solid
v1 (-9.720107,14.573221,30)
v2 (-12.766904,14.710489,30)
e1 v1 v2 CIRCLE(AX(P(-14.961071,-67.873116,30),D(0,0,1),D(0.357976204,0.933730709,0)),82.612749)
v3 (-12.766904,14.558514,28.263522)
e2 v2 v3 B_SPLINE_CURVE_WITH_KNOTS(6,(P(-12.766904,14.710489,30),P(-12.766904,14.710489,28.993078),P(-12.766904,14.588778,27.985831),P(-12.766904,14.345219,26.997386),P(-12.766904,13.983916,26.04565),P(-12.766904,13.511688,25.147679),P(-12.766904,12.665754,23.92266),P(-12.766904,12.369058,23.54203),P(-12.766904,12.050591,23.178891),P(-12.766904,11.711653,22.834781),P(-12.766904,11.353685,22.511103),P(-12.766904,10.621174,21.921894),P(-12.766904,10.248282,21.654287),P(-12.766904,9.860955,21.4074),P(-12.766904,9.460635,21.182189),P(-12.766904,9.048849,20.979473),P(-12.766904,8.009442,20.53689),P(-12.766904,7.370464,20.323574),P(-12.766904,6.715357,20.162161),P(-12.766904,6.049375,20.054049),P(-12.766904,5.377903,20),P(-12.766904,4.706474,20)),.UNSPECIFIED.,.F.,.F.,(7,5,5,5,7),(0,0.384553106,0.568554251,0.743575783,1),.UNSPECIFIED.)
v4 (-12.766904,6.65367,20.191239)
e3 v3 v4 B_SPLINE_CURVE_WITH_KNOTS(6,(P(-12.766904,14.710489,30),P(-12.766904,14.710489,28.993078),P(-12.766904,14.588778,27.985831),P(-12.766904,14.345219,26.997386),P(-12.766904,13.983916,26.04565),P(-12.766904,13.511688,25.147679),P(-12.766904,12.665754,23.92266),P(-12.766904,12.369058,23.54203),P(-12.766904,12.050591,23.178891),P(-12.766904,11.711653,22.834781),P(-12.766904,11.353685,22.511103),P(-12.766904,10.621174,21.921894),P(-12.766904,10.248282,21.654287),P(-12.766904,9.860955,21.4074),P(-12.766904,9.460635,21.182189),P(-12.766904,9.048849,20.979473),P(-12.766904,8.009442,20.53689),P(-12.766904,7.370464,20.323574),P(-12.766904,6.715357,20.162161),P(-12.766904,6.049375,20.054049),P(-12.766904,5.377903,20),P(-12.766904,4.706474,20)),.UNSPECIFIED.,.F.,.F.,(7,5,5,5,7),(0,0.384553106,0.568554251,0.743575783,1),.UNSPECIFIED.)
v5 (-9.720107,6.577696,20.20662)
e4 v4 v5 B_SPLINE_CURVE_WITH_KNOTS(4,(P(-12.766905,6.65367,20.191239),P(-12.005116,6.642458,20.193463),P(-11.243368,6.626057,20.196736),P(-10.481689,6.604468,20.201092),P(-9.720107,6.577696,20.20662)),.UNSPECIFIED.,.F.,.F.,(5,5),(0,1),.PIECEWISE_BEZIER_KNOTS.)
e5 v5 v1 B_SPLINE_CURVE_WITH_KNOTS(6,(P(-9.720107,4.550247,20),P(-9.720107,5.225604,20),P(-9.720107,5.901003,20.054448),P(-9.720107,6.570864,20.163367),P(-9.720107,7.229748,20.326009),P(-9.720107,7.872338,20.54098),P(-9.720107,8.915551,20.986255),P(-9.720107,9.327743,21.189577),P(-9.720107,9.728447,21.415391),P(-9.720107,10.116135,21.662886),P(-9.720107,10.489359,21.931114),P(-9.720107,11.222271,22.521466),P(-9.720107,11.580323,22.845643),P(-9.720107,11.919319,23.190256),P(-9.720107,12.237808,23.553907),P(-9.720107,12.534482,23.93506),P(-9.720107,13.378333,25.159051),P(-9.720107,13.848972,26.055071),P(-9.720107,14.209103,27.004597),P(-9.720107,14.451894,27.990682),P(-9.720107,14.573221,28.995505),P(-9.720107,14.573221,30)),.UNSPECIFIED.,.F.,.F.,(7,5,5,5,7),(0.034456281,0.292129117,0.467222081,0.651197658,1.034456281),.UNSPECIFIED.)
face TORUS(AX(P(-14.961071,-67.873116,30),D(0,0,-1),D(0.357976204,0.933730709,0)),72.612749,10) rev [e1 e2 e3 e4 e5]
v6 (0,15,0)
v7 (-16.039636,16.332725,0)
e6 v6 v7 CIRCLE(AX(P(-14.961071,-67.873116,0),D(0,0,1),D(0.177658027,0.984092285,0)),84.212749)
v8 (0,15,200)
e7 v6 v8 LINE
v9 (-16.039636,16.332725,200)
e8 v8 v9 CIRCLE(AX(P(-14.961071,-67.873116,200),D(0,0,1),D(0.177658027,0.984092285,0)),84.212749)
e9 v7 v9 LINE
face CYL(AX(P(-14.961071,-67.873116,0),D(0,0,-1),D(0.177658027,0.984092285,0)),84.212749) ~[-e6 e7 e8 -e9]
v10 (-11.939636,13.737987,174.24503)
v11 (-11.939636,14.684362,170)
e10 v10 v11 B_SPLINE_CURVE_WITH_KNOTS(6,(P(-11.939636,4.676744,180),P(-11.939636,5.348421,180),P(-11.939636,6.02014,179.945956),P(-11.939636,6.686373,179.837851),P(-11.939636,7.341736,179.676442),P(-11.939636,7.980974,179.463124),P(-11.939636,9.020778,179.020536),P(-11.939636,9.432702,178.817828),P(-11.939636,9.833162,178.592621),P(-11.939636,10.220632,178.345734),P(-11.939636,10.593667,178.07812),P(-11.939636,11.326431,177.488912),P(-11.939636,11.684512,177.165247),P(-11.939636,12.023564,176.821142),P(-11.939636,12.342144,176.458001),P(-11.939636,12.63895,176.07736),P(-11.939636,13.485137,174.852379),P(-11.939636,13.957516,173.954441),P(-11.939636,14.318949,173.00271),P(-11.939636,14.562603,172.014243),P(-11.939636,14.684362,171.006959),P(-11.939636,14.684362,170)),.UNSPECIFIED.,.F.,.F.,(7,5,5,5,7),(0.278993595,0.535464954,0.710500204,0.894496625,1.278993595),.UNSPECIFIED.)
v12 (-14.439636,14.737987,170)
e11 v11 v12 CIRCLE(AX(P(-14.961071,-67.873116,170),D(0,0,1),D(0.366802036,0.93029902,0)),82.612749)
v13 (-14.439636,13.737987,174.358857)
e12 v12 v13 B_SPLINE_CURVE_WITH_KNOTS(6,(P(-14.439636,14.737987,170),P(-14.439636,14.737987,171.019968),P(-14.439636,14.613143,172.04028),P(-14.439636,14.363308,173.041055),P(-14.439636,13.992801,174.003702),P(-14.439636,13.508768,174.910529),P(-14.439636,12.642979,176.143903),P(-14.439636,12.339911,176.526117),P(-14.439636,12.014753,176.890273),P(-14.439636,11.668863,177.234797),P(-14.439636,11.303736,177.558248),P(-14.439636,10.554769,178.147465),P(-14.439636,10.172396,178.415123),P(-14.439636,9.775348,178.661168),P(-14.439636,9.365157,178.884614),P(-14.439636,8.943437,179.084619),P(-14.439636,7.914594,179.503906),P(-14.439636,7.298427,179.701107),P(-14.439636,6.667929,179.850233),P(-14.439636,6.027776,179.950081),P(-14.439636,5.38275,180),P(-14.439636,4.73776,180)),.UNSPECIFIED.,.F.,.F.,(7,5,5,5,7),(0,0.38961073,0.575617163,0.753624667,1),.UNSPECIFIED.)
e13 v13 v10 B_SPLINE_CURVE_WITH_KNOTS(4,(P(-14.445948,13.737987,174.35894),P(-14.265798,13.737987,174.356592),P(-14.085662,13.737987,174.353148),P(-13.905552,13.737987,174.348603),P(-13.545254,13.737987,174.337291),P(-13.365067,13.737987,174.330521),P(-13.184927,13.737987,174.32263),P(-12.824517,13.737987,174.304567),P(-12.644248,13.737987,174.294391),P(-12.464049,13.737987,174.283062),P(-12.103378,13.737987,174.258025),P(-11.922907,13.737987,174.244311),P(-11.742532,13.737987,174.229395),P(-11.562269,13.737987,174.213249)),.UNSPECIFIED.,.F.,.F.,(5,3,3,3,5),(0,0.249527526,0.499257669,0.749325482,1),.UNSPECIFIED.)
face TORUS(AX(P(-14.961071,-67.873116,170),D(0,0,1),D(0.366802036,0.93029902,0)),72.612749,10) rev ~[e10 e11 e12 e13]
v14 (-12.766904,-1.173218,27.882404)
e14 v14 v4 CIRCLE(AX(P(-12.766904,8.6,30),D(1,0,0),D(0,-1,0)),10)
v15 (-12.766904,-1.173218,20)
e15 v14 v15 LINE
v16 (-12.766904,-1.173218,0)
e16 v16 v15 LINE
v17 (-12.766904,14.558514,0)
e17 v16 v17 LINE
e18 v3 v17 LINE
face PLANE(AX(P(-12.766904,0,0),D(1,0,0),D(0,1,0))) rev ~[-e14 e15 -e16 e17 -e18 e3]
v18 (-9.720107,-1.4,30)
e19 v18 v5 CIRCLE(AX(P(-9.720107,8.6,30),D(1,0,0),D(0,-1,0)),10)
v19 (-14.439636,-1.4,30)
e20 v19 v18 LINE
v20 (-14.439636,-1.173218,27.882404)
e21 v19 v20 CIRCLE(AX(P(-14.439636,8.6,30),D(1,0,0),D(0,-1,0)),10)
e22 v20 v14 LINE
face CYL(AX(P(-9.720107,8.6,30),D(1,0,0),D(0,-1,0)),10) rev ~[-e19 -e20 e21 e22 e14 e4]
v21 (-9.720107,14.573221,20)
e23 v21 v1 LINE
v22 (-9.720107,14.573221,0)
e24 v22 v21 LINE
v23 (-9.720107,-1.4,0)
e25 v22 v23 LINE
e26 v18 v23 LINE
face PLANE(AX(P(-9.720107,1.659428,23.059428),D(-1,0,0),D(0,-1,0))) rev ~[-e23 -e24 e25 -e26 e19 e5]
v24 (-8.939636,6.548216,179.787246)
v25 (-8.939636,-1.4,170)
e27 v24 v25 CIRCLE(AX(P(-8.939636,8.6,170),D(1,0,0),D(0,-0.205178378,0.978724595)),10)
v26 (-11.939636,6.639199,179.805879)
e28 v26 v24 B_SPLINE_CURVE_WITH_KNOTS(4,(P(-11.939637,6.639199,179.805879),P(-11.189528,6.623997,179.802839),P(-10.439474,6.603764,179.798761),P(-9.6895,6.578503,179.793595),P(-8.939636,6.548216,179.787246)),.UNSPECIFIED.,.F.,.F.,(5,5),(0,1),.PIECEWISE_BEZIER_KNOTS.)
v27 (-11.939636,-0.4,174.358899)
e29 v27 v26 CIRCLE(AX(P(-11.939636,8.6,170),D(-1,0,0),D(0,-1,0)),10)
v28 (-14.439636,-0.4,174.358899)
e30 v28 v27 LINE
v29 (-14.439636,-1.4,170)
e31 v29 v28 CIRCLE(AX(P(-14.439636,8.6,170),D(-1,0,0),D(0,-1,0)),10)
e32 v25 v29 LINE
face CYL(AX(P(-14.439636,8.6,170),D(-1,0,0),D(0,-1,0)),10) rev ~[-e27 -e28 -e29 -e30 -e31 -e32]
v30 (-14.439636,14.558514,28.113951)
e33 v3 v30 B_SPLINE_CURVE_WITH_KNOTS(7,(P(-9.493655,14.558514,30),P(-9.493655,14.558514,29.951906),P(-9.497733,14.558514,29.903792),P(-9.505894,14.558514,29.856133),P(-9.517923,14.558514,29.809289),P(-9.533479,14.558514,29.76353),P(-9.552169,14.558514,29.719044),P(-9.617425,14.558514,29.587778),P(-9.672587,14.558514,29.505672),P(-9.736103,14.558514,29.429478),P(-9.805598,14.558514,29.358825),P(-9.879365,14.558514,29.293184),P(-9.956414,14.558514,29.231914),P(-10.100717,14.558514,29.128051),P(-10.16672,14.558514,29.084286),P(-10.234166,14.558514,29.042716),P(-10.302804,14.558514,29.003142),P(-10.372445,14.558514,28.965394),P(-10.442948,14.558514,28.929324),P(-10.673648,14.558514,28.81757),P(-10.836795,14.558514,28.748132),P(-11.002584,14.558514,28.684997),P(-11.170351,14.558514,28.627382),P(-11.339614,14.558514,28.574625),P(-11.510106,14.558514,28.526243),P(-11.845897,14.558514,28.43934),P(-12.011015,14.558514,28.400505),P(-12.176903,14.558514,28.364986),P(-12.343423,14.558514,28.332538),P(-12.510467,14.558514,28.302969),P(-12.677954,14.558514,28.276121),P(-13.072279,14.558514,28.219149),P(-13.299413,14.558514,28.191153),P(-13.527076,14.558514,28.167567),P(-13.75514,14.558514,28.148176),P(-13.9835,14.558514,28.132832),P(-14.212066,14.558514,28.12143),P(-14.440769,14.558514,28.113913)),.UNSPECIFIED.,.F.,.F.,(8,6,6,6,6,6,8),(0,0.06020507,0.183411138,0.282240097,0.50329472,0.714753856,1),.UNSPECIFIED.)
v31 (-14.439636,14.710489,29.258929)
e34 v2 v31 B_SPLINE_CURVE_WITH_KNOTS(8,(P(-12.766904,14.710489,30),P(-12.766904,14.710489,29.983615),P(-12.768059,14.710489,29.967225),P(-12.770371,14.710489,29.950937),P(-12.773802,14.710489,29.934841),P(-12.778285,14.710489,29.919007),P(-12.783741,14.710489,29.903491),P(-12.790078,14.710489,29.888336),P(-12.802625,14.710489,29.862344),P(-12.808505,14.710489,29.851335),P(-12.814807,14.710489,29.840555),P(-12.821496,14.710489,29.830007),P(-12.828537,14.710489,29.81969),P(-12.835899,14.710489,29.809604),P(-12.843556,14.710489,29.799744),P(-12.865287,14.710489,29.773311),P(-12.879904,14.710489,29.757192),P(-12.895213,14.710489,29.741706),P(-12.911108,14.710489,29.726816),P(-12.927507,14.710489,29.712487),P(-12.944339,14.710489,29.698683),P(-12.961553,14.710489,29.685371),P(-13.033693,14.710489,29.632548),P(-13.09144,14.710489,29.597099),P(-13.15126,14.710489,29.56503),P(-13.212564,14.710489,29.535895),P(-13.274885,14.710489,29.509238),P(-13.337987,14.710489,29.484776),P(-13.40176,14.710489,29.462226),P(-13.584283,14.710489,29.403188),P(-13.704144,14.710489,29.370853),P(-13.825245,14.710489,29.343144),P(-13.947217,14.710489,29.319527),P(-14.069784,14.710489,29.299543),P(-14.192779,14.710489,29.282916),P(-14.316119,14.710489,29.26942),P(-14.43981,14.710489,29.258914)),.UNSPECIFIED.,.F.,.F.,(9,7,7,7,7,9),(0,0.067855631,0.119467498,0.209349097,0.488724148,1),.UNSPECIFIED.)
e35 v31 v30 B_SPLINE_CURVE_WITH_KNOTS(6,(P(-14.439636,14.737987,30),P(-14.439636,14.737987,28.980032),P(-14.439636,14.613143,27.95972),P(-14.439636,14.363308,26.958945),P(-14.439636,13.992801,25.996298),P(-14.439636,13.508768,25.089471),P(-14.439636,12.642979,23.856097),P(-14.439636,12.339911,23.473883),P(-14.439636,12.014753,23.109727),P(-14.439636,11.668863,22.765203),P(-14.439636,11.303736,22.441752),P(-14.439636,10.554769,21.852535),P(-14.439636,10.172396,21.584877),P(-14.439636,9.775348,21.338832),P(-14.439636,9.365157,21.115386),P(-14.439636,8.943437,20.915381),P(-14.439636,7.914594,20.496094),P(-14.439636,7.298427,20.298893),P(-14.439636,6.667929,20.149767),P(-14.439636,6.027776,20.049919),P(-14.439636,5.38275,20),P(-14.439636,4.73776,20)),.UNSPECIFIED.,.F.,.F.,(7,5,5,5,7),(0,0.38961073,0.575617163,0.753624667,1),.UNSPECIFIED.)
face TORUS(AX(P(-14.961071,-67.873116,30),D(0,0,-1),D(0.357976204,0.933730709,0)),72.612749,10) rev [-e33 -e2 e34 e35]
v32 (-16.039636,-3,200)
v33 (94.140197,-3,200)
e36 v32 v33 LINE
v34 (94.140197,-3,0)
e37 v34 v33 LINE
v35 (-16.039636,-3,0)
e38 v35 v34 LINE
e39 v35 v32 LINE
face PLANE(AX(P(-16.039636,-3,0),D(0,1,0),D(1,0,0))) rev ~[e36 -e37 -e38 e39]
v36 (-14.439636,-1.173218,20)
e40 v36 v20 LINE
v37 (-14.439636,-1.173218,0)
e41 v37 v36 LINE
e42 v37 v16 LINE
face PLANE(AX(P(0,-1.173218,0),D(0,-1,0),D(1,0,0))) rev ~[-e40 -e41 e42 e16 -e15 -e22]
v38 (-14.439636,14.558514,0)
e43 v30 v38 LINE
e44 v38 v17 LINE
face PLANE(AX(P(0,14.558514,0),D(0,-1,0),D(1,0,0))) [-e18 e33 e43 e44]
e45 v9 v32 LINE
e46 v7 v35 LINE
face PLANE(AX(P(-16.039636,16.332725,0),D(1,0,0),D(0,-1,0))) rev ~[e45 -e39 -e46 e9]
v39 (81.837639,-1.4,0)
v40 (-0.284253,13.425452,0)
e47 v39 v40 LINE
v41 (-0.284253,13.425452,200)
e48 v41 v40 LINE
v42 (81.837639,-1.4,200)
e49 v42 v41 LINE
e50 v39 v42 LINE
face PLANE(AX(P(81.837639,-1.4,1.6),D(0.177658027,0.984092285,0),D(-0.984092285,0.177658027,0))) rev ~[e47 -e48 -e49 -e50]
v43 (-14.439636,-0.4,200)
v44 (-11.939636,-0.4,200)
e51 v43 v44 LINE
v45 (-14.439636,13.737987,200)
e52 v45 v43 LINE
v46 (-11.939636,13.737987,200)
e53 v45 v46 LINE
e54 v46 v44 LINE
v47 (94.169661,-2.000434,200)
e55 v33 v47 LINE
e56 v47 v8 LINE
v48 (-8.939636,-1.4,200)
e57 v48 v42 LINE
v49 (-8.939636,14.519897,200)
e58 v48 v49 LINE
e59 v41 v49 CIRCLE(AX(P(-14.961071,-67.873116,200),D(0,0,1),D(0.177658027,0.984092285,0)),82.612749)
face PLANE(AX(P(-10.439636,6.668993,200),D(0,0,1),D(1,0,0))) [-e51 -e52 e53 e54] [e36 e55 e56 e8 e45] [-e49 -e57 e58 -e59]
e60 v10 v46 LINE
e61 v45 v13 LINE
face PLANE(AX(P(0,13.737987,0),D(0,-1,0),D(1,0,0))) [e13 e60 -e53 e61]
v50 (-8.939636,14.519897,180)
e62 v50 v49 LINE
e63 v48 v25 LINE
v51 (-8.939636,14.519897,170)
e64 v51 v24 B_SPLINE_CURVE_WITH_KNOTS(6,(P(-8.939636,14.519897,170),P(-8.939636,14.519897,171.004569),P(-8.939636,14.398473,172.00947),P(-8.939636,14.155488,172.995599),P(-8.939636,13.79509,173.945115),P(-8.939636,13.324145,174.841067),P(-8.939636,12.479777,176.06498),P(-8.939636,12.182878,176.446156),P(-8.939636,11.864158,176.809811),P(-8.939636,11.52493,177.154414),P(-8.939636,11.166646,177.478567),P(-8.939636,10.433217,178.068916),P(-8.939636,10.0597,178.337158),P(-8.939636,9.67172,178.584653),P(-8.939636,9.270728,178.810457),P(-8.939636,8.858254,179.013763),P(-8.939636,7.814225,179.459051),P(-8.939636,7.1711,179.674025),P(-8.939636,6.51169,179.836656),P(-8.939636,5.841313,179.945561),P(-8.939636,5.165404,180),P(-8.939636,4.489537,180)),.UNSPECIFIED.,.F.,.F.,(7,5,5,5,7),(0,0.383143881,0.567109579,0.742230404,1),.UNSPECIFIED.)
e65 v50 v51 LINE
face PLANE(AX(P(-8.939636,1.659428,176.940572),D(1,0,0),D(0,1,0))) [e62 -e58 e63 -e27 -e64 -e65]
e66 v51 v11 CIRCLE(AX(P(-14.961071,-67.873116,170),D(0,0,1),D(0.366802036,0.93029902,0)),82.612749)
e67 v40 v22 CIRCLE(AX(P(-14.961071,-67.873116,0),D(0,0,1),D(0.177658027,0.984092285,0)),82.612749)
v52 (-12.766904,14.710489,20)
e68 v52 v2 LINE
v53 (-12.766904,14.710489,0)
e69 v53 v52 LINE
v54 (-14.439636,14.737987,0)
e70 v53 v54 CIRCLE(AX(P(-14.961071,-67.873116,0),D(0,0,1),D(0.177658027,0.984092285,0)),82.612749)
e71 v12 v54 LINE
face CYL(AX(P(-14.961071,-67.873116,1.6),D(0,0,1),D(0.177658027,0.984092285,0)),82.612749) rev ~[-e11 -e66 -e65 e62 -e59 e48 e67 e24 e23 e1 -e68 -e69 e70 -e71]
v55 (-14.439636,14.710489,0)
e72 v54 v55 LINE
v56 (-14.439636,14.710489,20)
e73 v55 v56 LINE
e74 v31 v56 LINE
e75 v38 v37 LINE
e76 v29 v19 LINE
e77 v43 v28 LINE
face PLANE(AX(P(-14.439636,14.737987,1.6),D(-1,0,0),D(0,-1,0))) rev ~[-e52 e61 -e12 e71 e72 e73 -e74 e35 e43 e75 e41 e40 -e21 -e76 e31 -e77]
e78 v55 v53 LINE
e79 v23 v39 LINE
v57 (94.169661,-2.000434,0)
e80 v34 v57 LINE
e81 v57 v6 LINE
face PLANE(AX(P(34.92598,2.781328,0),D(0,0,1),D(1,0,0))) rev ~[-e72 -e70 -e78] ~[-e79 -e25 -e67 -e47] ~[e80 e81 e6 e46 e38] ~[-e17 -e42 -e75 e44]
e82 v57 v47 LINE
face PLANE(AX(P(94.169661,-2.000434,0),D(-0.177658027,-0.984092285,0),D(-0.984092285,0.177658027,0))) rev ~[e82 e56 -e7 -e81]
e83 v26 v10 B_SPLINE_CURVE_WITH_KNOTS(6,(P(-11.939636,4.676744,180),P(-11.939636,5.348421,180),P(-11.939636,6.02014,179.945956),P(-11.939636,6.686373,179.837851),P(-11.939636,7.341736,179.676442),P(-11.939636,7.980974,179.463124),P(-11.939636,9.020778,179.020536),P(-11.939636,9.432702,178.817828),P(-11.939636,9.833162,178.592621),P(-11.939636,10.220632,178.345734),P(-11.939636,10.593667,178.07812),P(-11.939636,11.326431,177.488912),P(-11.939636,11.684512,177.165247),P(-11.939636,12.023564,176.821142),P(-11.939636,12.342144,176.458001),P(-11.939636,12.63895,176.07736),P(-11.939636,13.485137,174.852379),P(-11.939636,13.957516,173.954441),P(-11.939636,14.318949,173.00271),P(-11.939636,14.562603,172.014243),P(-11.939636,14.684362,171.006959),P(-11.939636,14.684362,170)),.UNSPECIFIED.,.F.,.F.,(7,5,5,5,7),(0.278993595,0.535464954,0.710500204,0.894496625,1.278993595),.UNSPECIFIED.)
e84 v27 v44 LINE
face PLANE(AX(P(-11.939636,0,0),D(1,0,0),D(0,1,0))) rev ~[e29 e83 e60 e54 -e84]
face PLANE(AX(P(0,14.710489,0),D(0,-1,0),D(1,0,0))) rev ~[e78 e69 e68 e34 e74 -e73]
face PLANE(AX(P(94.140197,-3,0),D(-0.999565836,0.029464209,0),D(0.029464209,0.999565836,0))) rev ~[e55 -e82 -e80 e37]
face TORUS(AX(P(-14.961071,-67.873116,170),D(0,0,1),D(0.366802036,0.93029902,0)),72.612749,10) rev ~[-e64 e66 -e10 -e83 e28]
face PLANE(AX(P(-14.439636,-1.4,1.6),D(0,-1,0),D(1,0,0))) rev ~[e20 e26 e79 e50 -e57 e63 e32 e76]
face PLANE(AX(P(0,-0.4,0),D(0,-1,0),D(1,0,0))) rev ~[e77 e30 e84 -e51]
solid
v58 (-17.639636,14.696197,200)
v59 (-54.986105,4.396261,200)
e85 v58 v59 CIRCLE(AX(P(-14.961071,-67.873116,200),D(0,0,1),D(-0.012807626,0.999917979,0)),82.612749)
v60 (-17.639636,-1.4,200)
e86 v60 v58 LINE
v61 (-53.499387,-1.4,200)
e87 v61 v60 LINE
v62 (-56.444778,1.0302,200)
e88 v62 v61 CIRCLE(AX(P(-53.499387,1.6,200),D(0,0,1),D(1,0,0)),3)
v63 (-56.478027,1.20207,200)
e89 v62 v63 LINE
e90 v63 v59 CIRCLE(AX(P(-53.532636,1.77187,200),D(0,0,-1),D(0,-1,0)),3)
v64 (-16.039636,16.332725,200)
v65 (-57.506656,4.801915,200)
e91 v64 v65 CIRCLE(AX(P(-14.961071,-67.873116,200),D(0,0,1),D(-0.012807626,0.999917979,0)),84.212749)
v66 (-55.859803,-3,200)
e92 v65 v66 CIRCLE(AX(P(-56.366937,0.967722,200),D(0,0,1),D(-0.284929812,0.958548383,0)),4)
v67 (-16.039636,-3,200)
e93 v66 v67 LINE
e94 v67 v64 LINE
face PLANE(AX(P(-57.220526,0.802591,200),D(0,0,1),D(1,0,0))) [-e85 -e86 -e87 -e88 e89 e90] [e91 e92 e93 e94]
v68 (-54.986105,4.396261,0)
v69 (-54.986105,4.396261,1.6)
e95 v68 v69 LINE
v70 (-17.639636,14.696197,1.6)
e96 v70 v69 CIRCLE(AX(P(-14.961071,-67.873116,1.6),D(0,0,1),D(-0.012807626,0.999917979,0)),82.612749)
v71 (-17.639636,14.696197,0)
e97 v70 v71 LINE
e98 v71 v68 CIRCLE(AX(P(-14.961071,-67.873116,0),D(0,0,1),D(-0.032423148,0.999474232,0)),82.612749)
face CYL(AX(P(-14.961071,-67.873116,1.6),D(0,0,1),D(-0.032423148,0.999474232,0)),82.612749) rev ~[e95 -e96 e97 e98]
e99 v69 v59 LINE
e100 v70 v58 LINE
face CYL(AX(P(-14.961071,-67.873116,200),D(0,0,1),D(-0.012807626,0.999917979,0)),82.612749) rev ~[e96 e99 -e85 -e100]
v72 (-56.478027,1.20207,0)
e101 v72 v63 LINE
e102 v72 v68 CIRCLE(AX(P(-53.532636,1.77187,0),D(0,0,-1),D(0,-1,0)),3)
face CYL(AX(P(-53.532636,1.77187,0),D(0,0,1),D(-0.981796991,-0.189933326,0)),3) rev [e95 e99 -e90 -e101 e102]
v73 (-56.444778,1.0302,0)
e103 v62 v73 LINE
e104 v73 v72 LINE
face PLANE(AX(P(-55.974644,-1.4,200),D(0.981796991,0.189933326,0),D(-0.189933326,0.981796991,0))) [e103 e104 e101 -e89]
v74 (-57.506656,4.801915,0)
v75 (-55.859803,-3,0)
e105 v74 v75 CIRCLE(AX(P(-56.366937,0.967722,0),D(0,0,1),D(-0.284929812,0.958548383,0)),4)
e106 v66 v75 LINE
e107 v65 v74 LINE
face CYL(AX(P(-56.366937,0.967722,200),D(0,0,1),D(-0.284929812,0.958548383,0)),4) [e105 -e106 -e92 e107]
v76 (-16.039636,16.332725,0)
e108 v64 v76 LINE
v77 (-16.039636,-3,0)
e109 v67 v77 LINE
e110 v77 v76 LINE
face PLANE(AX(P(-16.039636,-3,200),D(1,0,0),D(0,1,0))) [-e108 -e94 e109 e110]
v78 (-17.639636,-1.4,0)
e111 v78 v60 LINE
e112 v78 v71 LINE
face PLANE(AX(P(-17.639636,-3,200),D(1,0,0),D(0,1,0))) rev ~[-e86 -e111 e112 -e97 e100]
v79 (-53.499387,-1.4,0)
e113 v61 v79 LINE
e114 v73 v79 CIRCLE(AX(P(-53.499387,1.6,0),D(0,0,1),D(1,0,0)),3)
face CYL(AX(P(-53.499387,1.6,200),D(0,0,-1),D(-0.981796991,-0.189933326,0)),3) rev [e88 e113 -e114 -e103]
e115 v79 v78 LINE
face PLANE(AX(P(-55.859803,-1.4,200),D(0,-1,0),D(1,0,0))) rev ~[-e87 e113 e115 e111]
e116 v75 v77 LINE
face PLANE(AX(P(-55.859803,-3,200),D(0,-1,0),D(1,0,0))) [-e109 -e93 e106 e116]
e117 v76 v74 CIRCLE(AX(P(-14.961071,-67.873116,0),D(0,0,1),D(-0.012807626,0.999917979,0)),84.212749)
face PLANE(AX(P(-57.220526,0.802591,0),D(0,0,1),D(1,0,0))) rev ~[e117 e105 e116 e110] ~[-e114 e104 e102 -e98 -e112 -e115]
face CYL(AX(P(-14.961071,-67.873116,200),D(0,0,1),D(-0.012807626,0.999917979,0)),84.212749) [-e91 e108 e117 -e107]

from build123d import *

# Parameters (mm, degrees)
F1_DEPTH      = 200
F3_DEPTH      = 200
F4_T          = -1.6
F4_2_T        = -1.6
F5_DEPTH      = 1.6
F6_W          = 2.5
F6_H          = 1
F7_DEPTH      = 20
F8_T4_ANGLE   = 38.4955577252
F8_T11_ANGLE  = 38.4955577252
F8_T18_ANGLE  = 38.4955577252
F8_T25_DEPTH  = 5.5
F8_T31_DEPTH  = 5.5
F8_T37_DEPTH  = 5.5
F9_W          = 1.672731913
F9_H          = 0.2267822191
F9_H_2        = 0.1519754522
F10_DEPTH     = 20
F11_T4_ANGLE  = 36.7926896337
F11_T10_ANGLE = 36.7926896337
F11_T18_DEPTH = 29.7195290041
F11_T23_DEPTH = 4.7195290041
F13_DEPTH     = 200
F14_R         = 3


# Not quite as in the source:
# - a fillet or chamfer that OpenCascade refuses, or shapes differently, is made with other operations: its cross-section is extruded or revolved along the edge and cut away or added


with BuildPart() as f1:
    # F0 (on Top) → F1 (new body)
    with BuildSketch(Plane.XY):
        with BuildLine():
            Line((94.1401966023, -3), (94.1696608117, -2.0004341641))
            Line((94.1696608117, -2.0004341641), (0, 15))
            ThreePointArc((0, 15), (-7.9879059152, 16.0504323354), (-16.0396361483, 16.3327251865))
            Line((-16.0396361483, 16.3327251865), (-16.0396361483, -3))
            Line((-16.0396361483, -3), (94.1401966023, -3))
        make_face()
    extrude(amount=F1_DEPTH)

    # F4
    f4_openings = [f1.faces().sort_by_distance(p)[0] for p in [
        (22.614044, 3.891358, 200),
    ]]
    offset(amount=F4_T, openings=f4_openings)


with BuildPart() as f3:
    # F2 (on face) → F3 (new body)
    with BuildSketch(Plane.XY.offset(200)):
        with BuildLine():
            Line((-16.0396361483, -3), (-16.0396361483, 16.3327251865))
            ThreePointArc((-16.0396361483, 16.3327251865), (-37.5222437907, 13.2612199418), (-57.5066562048, 4.8019152395))
            ThreePointArc((-57.5066562048, 4.8019152395), (-60.2806962129, 0.1415930949), (-55.8598033977, -3))
            Line((-55.8598033977, -3), (-16.0396361483, -3))
        make_face()
    extrude(amount=-F3_DEPTH)

    # F4#2
    f4_2_openings = [f3.faces().sort_by_distance(p)[0] for p in [
        (-34.83961, 5.023506, 200),
    ]]
    offset(amount=F4_2_T, openings=f4_2_openings, kind=Kind.INTERSECTION)


with BuildPart() as f5_tool:
    # F4_face (on face) → F5 (new body, through all)
    with BuildSketch(Plane(origin=(-34.5686000718, 5.0952187138, 1.6), x_dir=(1, 0, 0), z_dir=(0, 0, 1))):
        with BuildLine():
            ThreePointArc((16.9289639236, 9.600978508), (-3.4092890923, 6.3732828215), (-22.3173938219, -1.7842983593))
            ThreePointArc((-22.3173938219, -1.7842983593), (-24.1546496637, -4.5833369872), (-21.4060437384, -6.4952187138))
            Line((-21.4060437384, -6.4952187138), (16.9289639236, -6.4952187138))
            Line((16.9289639236, -6.4952187138), (16.9289639236, 9.600978508))
        make_face()
        with BuildLine():
            Line((116.4062392425, -6.4952187138), (34.2843472293, 8.3302336301))
            ThreePointArc((34.2843472293, 8.3302336301), (27.2349408421, 9.2915509636), (20.1289639236, 9.6427680764))
            Line((20.1289639236, 9.6427680764), (20.1289639236, -6.4952187138))
            Line((20.1289639236, -6.4952187138), (116.4062392425, -6.4952187138))
        make_face()
    extrude(amount=-F5_DEPTH)


with BuildPart() as f1_1:
    add(f1.part)

    # F5: cut by f5_tool
    add(f5_tool.part, mode=Mode.SUBTRACT)

    # F6 (on face) → F7 (join)
    with BuildSketch(Plane.XY.offset(200)):
        Polygon((-11.9396361483, -0.4), (-11.9396361483, -1.4), (-8.9396361483, -1.4), (-8.9396361483, 14.7379867902), (-11.9396361483, 14.7379867902), (-11.9396361483, 13.7379867902), align=None)
        with Locations((-13.1896361483, -0.9)):
            Rectangle(F6_W, F6_H)
        with Locations((-13.1896361483, 14.2379867902)):
            Rectangle(F6_W, F6_H)
    extrude(amount=-F7_DEPTH)

    # F8: fillet of radius 10 on 2 edges, made by hand


with BuildPart() as f3_1:
    add(f3.part)

    # F5: cut by f5_tool
    add(f5_tool.part, mode=Mode.SUBTRACT)

    # F12 (on face) → F13 (join)
    with BuildSketch(Plane.XY.offset(200)):
        with BuildLine():
            Line((-55.9746438103, -1.4), (-56.8859938937, 3.3109203545))
            ThreePointArc((-56.8859938937, 3.3109203545), (-58.7232497355, 0.5118817266), (-55.9746438103, -1.4))
        make_face()
    extrude(amount=-F13_DEPTH)

    # F14
    f14_edges = [f3_1.edges().sort_by_distance(p)[0] for p in [
        (-56.885994, 3.31092, 100),
        (-55.974644, -1.4, 100),
    ]]
    fillet(f14_edges, radius=F14_R)


with BuildPart() as f8_tool2:
    # F8_s3 → F8_t4 (revolve)
    with BuildSketch(Plane(origin=(10.2125694644, -4.0266529318, 0), x_dir=(0, 0, 1), z_dir=(0.9302990198, -0.3668020363, 0))):
        with BuildLine():
            ThreePointArc((170, -13.982703924), (177.0710678119, -11.0537717359), (180, -3.982703924))
            Line((180, -3.982703924), (180, -13.982703924))
            Line((180, -13.982703924), (170, -13.982703924))
        make_face()
    revolve(axis=Axis((-14.9610707823, -67.8731164952, 180), (0, 0, 1)), revolution_arc=F8_T4_ANGLE)

    split(bisect_by=Plane.YZ.offset(-8.9396361483), keep=Keep.BOTTOM)

    split(bisect_by=Plane.YZ.offset(-11.9396361483), keep=Keep.TOP)

    split(bisect_by=Plane.XZ.offset(-13.7379867902), keep=Keep.TOP)


with BuildPart() as f1_2:
    add(f1_1.part)

    # F8_t1: union F8_tool2
    add(f8_tool2.part)


with BuildPart() as f8_tool9:
    # F8_s10 → F8_t11 (revolve)
    with BuildSketch(Plane(origin=(10.2125694644, -4.0266529318, 0), x_dir=(0, 0, 1), z_dir=(0.9302990198, -0.3668020363, 0))):
        with BuildLine():
            ThreePointArc((170, -13.982703924), (177.0710678119, -11.0537717359), (180, -3.982703924))
            Line((180, -3.982703924), (180, -13.982703924))
            Line((180, -13.982703924), (170, -13.982703924))
        make_face()
    revolve(axis=Axis((-14.9610707823, -67.8731164952, 180), (0, 0, 1)), revolution_arc=F8_T11_ANGLE)

    split(bisect_by=Plane.YZ.offset(-8.9396361483), keep=Keep.BOTTOM)

    split(bisect_by=Plane.YZ.offset(-11.9396361483), keep=Keep.TOP)

    split(bisect_by=Plane.XZ.offset(-13.7379867902), keep=Keep.BOTTOM)


with BuildPart() as f1_3:
    add(f1_2.part)

    # F8_t8: union F8_tool9
    add(f8_tool9.part)


with BuildPart() as f8_tool16:
    # F8_s17 → F8_t18 (revolve)
    with BuildSketch(Plane(origin=(10.2125694644, -4.0266529318, 0), x_dir=(0, 0, 1), z_dir=(0.9302990198, -0.3668020363, 0))):
        with BuildLine():
            ThreePointArc((170, -13.982703924), (177.0710678119, -11.0537717359), (180, -3.982703924))
            Line((180, -3.982703924), (180, -13.982703924))
            Line((180, -13.982703924), (170, -13.982703924))
        make_face()
    revolve(axis=Axis((-14.9610707823, -67.8731164952, 180), (0, 0, 1)), revolution_arc=F8_T18_ANGLE)

    split(bisect_by=Plane.YZ.offset(-14.4396361483), keep=Keep.TOP)

    split(bisect_by=Plane.YZ.offset(-11.9396361483), keep=Keep.BOTTOM)

    split(bisect_by=Plane.XZ.offset(-13.7379867902), keep=Keep.BOTTOM)


with BuildPart() as f1_4:
    add(f1_3.part)

    # F8_t15: union F8_tool16
    add(f8_tool16.part)


with BuildPart() as f8_tool23:
    # F8_s24 → F8_t25 (new body)
    with BuildSketch(Plane.YZ.offset(-14.4396361483)):
        with BuildLine():
            ThreePointArc((-1.4, 170), (1.5289321881, 177.0710678119), (8.6, 180))
            Line((8.6, 180), (-1.4, 180))
            Line((-1.4, 180), (-1.4, 170))
        make_face()
    extrude(amount=F8_T25_DEPTH)

    split(bisect_by=Plane.XZ.offset(0.4), keep=Keep.TOP)

    split(bisect_by=Plane.YZ.offset(-11.9396361483), keep=Keep.BOTTOM)


with BuildPart() as f1_5:
    add(f1_4.part)

    # F8_t22: union F8_tool23
    add(f8_tool23.part)


with BuildPart() as f8_tool29:
    # F8_s30 → F8_t31 (new body)
    with BuildSketch(Plane.YZ.offset(-14.4396361483)):
        with BuildLine():
            ThreePointArc((-1.4, 170), (1.5289321881, 177.0710678119), (8.6, 180))
            Line((8.6, 180), (-1.4, 180))
            Line((-1.4, 180), (-1.4, 170))
        make_face()
    extrude(amount=F8_T31_DEPTH)

    split(bisect_by=Plane.XZ.offset(0.4), keep=Keep.TOP)

    split(bisect_by=Plane.YZ.offset(-11.9396361483), keep=Keep.TOP)


with BuildPart() as f1_6:
    add(f1_5.part)

    # F8_t28: union F8_tool29
    add(f8_tool29.part)


with BuildPart() as f8_tool35:
    # F8_s36 → F8_t37 (new body)
    with BuildSketch(Plane.YZ.offset(-14.4396361483)):
        with BuildLine():
            ThreePointArc((-1.4, 170), (1.5289321881, 177.0710678119), (8.6, 180))
            Line((8.6, 180), (-1.4, 180))
            Line((-1.4, 180), (-1.4, 170))
        make_face()
    extrude(amount=F8_T37_DEPTH)

    split(bisect_by=Plane.XZ.offset(0.4), keep=Keep.BOTTOM)

    split(bisect_by=Plane.YZ.offset(-11.9396361483), keep=Keep.TOP)


with BuildPart() as f1_7:
    add(f1_6.part)

    # F8_t34: union F8_tool35
    add(f8_tool35.part)

    # F9 (on face) → F10 (join)
    with BuildSketch(Plane(origin=(0, 0, 0), x_dir=(1, 0, 0), z_dir=(0, 0, -1))):
        Polygon((-9.7201071442, -14.7104891011), (-9.7201071442, 1.4), (-12.7669042352, 1.4), (-12.7669042352, 1.1732177809), (-12.7669042352, -14.5585136488), (-12.7669042352, -14.7104891011), align=None)
        with Locations((-13.6032701918, 1.2866088904)):
            Rectangle(F9_W, F9_H)
        with Locations((-13.6032701918, -14.6345013749)):
            Rectangle(F9_W, F9_H_2)
    extrude(amount=-F10_DEPTH)

    # F11: fillet of radius 10 on 2 edges, made by hand


with BuildPart() as f11_tool2:
    # F11_s3 → F11_t4 (revolve)
    with BuildSketch(Plane(origin=(9.6429632601, -3.6969453305, 0), x_dir=(0, 0, 1), z_dir=(0.9337307092, -0.3579762042, 0))):
        with BuildLine():
            ThreePointArc((30, -13.8818283686), (22.9289321881, -10.9528961805), (20, -3.8818283686))
            Line((20, -3.8818283686), (20, -13.8818283686))
            Line((20, -13.8818283686), (30, -13.8818283686))
        make_face()
    revolve(axis=Axis((-14.9610707823, -67.8731164952, 20), (0, 0, 1)), revolution_arc=F11_T4_ANGLE)

    split(bisect_by=Plane.YZ.offset(-12.7669042352), keep=Keep.TOP)

    split(bisect_by=Plane.YZ.offset(-9.7201071442), keep=Keep.BOTTOM)


with BuildPart() as f1_8:
    add(f1_7.part)

    # F11_t1: union F11_tool2
    add(f11_tool2.part)


with BuildPart() as f11_tool8:
    # F11_s9 → F11_t10 (revolve)
    with BuildSketch(Plane(origin=(9.6429632601, -3.6969453305, 0), x_dir=(0, 0, 1), z_dir=(0.9337307092, -0.3579762042, 0))):
        with BuildLine():
            ThreePointArc((30, -13.8818283686), (22.9289321881, -10.9528961805), (20, -3.8818283686))
            Line((20, -3.8818283686), (20, -13.8818283686))
            Line((20, -13.8818283686), (30, -13.8818283686))
        make_face()
    revolve(axis=Axis((-14.9610707823, -67.8731164952, 20), (0, 0, 1)), revolution_arc=F11_T10_ANGLE)

    split(bisect_by=Plane.YZ.offset(-14.4396361483), keep=Keep.TOP)

    split(bisect_by=Plane.XZ.offset(-14.5585136488), keep=Keep.BOTTOM)

    split(bisect_by=Plane.XZ.offset(-14.7104891011), keep=Keep.TOP)

    split(bisect_by=Plane.YZ.offset(-9.7201071442), keep=Keep.BOTTOM)


with BuildPart() as f1_9:
    add(f1_8.part)

    # F11_t7: union F11_tool8
    add(f11_tool8.part)


with BuildPart() as f11_tool16:
    # F11_s17 → F11_t18 (new body)
    with BuildSketch(Plane.YZ.offset(-9.7201071442)):
        with BuildLine():
            ThreePointArc((-1.4, 30), (1.5289321881, 22.9289321881), (8.6, 20))
            Line((8.6, 20), (-1.4, 20))
            Line((-1.4, 20), (-1.4, 30))
        make_face()
    extrude(amount=-F11_T18_DEPTH)

    split(bisect_by=Plane.YZ.offset(-12.7669042352), keep=Keep.TOP)


with BuildPart() as f1_10:
    add(f1_9.part)

    # F11_t15: union F11_tool16
    add(f11_tool16.part)


with BuildPart() as f11_tool21:
    # F11_s22 → F11_t23 (new body)
    with BuildSketch(Plane.YZ.offset(-9.7201071442)):
        with BuildLine():
            ThreePointArc((-1.4, 30), (1.5289321881, 22.9289321881), (8.6, 20))
            Line((8.6, 20), (-1.4, 20))
            Line((-1.4, 20), (-1.4, 30))
        make_face()
    extrude(amount=-F11_T23_DEPTH)

    split(bisect_by=Plane.XZ.offset(1.1732177809), keep=Keep.TOP)


with BuildPart() as f1_11:
    add(f1_10.part)

    # F11_t20: union F11_tool21
    add(f11_tool21.part)


solid = Compound([f3_1.part, f1_11.part])
